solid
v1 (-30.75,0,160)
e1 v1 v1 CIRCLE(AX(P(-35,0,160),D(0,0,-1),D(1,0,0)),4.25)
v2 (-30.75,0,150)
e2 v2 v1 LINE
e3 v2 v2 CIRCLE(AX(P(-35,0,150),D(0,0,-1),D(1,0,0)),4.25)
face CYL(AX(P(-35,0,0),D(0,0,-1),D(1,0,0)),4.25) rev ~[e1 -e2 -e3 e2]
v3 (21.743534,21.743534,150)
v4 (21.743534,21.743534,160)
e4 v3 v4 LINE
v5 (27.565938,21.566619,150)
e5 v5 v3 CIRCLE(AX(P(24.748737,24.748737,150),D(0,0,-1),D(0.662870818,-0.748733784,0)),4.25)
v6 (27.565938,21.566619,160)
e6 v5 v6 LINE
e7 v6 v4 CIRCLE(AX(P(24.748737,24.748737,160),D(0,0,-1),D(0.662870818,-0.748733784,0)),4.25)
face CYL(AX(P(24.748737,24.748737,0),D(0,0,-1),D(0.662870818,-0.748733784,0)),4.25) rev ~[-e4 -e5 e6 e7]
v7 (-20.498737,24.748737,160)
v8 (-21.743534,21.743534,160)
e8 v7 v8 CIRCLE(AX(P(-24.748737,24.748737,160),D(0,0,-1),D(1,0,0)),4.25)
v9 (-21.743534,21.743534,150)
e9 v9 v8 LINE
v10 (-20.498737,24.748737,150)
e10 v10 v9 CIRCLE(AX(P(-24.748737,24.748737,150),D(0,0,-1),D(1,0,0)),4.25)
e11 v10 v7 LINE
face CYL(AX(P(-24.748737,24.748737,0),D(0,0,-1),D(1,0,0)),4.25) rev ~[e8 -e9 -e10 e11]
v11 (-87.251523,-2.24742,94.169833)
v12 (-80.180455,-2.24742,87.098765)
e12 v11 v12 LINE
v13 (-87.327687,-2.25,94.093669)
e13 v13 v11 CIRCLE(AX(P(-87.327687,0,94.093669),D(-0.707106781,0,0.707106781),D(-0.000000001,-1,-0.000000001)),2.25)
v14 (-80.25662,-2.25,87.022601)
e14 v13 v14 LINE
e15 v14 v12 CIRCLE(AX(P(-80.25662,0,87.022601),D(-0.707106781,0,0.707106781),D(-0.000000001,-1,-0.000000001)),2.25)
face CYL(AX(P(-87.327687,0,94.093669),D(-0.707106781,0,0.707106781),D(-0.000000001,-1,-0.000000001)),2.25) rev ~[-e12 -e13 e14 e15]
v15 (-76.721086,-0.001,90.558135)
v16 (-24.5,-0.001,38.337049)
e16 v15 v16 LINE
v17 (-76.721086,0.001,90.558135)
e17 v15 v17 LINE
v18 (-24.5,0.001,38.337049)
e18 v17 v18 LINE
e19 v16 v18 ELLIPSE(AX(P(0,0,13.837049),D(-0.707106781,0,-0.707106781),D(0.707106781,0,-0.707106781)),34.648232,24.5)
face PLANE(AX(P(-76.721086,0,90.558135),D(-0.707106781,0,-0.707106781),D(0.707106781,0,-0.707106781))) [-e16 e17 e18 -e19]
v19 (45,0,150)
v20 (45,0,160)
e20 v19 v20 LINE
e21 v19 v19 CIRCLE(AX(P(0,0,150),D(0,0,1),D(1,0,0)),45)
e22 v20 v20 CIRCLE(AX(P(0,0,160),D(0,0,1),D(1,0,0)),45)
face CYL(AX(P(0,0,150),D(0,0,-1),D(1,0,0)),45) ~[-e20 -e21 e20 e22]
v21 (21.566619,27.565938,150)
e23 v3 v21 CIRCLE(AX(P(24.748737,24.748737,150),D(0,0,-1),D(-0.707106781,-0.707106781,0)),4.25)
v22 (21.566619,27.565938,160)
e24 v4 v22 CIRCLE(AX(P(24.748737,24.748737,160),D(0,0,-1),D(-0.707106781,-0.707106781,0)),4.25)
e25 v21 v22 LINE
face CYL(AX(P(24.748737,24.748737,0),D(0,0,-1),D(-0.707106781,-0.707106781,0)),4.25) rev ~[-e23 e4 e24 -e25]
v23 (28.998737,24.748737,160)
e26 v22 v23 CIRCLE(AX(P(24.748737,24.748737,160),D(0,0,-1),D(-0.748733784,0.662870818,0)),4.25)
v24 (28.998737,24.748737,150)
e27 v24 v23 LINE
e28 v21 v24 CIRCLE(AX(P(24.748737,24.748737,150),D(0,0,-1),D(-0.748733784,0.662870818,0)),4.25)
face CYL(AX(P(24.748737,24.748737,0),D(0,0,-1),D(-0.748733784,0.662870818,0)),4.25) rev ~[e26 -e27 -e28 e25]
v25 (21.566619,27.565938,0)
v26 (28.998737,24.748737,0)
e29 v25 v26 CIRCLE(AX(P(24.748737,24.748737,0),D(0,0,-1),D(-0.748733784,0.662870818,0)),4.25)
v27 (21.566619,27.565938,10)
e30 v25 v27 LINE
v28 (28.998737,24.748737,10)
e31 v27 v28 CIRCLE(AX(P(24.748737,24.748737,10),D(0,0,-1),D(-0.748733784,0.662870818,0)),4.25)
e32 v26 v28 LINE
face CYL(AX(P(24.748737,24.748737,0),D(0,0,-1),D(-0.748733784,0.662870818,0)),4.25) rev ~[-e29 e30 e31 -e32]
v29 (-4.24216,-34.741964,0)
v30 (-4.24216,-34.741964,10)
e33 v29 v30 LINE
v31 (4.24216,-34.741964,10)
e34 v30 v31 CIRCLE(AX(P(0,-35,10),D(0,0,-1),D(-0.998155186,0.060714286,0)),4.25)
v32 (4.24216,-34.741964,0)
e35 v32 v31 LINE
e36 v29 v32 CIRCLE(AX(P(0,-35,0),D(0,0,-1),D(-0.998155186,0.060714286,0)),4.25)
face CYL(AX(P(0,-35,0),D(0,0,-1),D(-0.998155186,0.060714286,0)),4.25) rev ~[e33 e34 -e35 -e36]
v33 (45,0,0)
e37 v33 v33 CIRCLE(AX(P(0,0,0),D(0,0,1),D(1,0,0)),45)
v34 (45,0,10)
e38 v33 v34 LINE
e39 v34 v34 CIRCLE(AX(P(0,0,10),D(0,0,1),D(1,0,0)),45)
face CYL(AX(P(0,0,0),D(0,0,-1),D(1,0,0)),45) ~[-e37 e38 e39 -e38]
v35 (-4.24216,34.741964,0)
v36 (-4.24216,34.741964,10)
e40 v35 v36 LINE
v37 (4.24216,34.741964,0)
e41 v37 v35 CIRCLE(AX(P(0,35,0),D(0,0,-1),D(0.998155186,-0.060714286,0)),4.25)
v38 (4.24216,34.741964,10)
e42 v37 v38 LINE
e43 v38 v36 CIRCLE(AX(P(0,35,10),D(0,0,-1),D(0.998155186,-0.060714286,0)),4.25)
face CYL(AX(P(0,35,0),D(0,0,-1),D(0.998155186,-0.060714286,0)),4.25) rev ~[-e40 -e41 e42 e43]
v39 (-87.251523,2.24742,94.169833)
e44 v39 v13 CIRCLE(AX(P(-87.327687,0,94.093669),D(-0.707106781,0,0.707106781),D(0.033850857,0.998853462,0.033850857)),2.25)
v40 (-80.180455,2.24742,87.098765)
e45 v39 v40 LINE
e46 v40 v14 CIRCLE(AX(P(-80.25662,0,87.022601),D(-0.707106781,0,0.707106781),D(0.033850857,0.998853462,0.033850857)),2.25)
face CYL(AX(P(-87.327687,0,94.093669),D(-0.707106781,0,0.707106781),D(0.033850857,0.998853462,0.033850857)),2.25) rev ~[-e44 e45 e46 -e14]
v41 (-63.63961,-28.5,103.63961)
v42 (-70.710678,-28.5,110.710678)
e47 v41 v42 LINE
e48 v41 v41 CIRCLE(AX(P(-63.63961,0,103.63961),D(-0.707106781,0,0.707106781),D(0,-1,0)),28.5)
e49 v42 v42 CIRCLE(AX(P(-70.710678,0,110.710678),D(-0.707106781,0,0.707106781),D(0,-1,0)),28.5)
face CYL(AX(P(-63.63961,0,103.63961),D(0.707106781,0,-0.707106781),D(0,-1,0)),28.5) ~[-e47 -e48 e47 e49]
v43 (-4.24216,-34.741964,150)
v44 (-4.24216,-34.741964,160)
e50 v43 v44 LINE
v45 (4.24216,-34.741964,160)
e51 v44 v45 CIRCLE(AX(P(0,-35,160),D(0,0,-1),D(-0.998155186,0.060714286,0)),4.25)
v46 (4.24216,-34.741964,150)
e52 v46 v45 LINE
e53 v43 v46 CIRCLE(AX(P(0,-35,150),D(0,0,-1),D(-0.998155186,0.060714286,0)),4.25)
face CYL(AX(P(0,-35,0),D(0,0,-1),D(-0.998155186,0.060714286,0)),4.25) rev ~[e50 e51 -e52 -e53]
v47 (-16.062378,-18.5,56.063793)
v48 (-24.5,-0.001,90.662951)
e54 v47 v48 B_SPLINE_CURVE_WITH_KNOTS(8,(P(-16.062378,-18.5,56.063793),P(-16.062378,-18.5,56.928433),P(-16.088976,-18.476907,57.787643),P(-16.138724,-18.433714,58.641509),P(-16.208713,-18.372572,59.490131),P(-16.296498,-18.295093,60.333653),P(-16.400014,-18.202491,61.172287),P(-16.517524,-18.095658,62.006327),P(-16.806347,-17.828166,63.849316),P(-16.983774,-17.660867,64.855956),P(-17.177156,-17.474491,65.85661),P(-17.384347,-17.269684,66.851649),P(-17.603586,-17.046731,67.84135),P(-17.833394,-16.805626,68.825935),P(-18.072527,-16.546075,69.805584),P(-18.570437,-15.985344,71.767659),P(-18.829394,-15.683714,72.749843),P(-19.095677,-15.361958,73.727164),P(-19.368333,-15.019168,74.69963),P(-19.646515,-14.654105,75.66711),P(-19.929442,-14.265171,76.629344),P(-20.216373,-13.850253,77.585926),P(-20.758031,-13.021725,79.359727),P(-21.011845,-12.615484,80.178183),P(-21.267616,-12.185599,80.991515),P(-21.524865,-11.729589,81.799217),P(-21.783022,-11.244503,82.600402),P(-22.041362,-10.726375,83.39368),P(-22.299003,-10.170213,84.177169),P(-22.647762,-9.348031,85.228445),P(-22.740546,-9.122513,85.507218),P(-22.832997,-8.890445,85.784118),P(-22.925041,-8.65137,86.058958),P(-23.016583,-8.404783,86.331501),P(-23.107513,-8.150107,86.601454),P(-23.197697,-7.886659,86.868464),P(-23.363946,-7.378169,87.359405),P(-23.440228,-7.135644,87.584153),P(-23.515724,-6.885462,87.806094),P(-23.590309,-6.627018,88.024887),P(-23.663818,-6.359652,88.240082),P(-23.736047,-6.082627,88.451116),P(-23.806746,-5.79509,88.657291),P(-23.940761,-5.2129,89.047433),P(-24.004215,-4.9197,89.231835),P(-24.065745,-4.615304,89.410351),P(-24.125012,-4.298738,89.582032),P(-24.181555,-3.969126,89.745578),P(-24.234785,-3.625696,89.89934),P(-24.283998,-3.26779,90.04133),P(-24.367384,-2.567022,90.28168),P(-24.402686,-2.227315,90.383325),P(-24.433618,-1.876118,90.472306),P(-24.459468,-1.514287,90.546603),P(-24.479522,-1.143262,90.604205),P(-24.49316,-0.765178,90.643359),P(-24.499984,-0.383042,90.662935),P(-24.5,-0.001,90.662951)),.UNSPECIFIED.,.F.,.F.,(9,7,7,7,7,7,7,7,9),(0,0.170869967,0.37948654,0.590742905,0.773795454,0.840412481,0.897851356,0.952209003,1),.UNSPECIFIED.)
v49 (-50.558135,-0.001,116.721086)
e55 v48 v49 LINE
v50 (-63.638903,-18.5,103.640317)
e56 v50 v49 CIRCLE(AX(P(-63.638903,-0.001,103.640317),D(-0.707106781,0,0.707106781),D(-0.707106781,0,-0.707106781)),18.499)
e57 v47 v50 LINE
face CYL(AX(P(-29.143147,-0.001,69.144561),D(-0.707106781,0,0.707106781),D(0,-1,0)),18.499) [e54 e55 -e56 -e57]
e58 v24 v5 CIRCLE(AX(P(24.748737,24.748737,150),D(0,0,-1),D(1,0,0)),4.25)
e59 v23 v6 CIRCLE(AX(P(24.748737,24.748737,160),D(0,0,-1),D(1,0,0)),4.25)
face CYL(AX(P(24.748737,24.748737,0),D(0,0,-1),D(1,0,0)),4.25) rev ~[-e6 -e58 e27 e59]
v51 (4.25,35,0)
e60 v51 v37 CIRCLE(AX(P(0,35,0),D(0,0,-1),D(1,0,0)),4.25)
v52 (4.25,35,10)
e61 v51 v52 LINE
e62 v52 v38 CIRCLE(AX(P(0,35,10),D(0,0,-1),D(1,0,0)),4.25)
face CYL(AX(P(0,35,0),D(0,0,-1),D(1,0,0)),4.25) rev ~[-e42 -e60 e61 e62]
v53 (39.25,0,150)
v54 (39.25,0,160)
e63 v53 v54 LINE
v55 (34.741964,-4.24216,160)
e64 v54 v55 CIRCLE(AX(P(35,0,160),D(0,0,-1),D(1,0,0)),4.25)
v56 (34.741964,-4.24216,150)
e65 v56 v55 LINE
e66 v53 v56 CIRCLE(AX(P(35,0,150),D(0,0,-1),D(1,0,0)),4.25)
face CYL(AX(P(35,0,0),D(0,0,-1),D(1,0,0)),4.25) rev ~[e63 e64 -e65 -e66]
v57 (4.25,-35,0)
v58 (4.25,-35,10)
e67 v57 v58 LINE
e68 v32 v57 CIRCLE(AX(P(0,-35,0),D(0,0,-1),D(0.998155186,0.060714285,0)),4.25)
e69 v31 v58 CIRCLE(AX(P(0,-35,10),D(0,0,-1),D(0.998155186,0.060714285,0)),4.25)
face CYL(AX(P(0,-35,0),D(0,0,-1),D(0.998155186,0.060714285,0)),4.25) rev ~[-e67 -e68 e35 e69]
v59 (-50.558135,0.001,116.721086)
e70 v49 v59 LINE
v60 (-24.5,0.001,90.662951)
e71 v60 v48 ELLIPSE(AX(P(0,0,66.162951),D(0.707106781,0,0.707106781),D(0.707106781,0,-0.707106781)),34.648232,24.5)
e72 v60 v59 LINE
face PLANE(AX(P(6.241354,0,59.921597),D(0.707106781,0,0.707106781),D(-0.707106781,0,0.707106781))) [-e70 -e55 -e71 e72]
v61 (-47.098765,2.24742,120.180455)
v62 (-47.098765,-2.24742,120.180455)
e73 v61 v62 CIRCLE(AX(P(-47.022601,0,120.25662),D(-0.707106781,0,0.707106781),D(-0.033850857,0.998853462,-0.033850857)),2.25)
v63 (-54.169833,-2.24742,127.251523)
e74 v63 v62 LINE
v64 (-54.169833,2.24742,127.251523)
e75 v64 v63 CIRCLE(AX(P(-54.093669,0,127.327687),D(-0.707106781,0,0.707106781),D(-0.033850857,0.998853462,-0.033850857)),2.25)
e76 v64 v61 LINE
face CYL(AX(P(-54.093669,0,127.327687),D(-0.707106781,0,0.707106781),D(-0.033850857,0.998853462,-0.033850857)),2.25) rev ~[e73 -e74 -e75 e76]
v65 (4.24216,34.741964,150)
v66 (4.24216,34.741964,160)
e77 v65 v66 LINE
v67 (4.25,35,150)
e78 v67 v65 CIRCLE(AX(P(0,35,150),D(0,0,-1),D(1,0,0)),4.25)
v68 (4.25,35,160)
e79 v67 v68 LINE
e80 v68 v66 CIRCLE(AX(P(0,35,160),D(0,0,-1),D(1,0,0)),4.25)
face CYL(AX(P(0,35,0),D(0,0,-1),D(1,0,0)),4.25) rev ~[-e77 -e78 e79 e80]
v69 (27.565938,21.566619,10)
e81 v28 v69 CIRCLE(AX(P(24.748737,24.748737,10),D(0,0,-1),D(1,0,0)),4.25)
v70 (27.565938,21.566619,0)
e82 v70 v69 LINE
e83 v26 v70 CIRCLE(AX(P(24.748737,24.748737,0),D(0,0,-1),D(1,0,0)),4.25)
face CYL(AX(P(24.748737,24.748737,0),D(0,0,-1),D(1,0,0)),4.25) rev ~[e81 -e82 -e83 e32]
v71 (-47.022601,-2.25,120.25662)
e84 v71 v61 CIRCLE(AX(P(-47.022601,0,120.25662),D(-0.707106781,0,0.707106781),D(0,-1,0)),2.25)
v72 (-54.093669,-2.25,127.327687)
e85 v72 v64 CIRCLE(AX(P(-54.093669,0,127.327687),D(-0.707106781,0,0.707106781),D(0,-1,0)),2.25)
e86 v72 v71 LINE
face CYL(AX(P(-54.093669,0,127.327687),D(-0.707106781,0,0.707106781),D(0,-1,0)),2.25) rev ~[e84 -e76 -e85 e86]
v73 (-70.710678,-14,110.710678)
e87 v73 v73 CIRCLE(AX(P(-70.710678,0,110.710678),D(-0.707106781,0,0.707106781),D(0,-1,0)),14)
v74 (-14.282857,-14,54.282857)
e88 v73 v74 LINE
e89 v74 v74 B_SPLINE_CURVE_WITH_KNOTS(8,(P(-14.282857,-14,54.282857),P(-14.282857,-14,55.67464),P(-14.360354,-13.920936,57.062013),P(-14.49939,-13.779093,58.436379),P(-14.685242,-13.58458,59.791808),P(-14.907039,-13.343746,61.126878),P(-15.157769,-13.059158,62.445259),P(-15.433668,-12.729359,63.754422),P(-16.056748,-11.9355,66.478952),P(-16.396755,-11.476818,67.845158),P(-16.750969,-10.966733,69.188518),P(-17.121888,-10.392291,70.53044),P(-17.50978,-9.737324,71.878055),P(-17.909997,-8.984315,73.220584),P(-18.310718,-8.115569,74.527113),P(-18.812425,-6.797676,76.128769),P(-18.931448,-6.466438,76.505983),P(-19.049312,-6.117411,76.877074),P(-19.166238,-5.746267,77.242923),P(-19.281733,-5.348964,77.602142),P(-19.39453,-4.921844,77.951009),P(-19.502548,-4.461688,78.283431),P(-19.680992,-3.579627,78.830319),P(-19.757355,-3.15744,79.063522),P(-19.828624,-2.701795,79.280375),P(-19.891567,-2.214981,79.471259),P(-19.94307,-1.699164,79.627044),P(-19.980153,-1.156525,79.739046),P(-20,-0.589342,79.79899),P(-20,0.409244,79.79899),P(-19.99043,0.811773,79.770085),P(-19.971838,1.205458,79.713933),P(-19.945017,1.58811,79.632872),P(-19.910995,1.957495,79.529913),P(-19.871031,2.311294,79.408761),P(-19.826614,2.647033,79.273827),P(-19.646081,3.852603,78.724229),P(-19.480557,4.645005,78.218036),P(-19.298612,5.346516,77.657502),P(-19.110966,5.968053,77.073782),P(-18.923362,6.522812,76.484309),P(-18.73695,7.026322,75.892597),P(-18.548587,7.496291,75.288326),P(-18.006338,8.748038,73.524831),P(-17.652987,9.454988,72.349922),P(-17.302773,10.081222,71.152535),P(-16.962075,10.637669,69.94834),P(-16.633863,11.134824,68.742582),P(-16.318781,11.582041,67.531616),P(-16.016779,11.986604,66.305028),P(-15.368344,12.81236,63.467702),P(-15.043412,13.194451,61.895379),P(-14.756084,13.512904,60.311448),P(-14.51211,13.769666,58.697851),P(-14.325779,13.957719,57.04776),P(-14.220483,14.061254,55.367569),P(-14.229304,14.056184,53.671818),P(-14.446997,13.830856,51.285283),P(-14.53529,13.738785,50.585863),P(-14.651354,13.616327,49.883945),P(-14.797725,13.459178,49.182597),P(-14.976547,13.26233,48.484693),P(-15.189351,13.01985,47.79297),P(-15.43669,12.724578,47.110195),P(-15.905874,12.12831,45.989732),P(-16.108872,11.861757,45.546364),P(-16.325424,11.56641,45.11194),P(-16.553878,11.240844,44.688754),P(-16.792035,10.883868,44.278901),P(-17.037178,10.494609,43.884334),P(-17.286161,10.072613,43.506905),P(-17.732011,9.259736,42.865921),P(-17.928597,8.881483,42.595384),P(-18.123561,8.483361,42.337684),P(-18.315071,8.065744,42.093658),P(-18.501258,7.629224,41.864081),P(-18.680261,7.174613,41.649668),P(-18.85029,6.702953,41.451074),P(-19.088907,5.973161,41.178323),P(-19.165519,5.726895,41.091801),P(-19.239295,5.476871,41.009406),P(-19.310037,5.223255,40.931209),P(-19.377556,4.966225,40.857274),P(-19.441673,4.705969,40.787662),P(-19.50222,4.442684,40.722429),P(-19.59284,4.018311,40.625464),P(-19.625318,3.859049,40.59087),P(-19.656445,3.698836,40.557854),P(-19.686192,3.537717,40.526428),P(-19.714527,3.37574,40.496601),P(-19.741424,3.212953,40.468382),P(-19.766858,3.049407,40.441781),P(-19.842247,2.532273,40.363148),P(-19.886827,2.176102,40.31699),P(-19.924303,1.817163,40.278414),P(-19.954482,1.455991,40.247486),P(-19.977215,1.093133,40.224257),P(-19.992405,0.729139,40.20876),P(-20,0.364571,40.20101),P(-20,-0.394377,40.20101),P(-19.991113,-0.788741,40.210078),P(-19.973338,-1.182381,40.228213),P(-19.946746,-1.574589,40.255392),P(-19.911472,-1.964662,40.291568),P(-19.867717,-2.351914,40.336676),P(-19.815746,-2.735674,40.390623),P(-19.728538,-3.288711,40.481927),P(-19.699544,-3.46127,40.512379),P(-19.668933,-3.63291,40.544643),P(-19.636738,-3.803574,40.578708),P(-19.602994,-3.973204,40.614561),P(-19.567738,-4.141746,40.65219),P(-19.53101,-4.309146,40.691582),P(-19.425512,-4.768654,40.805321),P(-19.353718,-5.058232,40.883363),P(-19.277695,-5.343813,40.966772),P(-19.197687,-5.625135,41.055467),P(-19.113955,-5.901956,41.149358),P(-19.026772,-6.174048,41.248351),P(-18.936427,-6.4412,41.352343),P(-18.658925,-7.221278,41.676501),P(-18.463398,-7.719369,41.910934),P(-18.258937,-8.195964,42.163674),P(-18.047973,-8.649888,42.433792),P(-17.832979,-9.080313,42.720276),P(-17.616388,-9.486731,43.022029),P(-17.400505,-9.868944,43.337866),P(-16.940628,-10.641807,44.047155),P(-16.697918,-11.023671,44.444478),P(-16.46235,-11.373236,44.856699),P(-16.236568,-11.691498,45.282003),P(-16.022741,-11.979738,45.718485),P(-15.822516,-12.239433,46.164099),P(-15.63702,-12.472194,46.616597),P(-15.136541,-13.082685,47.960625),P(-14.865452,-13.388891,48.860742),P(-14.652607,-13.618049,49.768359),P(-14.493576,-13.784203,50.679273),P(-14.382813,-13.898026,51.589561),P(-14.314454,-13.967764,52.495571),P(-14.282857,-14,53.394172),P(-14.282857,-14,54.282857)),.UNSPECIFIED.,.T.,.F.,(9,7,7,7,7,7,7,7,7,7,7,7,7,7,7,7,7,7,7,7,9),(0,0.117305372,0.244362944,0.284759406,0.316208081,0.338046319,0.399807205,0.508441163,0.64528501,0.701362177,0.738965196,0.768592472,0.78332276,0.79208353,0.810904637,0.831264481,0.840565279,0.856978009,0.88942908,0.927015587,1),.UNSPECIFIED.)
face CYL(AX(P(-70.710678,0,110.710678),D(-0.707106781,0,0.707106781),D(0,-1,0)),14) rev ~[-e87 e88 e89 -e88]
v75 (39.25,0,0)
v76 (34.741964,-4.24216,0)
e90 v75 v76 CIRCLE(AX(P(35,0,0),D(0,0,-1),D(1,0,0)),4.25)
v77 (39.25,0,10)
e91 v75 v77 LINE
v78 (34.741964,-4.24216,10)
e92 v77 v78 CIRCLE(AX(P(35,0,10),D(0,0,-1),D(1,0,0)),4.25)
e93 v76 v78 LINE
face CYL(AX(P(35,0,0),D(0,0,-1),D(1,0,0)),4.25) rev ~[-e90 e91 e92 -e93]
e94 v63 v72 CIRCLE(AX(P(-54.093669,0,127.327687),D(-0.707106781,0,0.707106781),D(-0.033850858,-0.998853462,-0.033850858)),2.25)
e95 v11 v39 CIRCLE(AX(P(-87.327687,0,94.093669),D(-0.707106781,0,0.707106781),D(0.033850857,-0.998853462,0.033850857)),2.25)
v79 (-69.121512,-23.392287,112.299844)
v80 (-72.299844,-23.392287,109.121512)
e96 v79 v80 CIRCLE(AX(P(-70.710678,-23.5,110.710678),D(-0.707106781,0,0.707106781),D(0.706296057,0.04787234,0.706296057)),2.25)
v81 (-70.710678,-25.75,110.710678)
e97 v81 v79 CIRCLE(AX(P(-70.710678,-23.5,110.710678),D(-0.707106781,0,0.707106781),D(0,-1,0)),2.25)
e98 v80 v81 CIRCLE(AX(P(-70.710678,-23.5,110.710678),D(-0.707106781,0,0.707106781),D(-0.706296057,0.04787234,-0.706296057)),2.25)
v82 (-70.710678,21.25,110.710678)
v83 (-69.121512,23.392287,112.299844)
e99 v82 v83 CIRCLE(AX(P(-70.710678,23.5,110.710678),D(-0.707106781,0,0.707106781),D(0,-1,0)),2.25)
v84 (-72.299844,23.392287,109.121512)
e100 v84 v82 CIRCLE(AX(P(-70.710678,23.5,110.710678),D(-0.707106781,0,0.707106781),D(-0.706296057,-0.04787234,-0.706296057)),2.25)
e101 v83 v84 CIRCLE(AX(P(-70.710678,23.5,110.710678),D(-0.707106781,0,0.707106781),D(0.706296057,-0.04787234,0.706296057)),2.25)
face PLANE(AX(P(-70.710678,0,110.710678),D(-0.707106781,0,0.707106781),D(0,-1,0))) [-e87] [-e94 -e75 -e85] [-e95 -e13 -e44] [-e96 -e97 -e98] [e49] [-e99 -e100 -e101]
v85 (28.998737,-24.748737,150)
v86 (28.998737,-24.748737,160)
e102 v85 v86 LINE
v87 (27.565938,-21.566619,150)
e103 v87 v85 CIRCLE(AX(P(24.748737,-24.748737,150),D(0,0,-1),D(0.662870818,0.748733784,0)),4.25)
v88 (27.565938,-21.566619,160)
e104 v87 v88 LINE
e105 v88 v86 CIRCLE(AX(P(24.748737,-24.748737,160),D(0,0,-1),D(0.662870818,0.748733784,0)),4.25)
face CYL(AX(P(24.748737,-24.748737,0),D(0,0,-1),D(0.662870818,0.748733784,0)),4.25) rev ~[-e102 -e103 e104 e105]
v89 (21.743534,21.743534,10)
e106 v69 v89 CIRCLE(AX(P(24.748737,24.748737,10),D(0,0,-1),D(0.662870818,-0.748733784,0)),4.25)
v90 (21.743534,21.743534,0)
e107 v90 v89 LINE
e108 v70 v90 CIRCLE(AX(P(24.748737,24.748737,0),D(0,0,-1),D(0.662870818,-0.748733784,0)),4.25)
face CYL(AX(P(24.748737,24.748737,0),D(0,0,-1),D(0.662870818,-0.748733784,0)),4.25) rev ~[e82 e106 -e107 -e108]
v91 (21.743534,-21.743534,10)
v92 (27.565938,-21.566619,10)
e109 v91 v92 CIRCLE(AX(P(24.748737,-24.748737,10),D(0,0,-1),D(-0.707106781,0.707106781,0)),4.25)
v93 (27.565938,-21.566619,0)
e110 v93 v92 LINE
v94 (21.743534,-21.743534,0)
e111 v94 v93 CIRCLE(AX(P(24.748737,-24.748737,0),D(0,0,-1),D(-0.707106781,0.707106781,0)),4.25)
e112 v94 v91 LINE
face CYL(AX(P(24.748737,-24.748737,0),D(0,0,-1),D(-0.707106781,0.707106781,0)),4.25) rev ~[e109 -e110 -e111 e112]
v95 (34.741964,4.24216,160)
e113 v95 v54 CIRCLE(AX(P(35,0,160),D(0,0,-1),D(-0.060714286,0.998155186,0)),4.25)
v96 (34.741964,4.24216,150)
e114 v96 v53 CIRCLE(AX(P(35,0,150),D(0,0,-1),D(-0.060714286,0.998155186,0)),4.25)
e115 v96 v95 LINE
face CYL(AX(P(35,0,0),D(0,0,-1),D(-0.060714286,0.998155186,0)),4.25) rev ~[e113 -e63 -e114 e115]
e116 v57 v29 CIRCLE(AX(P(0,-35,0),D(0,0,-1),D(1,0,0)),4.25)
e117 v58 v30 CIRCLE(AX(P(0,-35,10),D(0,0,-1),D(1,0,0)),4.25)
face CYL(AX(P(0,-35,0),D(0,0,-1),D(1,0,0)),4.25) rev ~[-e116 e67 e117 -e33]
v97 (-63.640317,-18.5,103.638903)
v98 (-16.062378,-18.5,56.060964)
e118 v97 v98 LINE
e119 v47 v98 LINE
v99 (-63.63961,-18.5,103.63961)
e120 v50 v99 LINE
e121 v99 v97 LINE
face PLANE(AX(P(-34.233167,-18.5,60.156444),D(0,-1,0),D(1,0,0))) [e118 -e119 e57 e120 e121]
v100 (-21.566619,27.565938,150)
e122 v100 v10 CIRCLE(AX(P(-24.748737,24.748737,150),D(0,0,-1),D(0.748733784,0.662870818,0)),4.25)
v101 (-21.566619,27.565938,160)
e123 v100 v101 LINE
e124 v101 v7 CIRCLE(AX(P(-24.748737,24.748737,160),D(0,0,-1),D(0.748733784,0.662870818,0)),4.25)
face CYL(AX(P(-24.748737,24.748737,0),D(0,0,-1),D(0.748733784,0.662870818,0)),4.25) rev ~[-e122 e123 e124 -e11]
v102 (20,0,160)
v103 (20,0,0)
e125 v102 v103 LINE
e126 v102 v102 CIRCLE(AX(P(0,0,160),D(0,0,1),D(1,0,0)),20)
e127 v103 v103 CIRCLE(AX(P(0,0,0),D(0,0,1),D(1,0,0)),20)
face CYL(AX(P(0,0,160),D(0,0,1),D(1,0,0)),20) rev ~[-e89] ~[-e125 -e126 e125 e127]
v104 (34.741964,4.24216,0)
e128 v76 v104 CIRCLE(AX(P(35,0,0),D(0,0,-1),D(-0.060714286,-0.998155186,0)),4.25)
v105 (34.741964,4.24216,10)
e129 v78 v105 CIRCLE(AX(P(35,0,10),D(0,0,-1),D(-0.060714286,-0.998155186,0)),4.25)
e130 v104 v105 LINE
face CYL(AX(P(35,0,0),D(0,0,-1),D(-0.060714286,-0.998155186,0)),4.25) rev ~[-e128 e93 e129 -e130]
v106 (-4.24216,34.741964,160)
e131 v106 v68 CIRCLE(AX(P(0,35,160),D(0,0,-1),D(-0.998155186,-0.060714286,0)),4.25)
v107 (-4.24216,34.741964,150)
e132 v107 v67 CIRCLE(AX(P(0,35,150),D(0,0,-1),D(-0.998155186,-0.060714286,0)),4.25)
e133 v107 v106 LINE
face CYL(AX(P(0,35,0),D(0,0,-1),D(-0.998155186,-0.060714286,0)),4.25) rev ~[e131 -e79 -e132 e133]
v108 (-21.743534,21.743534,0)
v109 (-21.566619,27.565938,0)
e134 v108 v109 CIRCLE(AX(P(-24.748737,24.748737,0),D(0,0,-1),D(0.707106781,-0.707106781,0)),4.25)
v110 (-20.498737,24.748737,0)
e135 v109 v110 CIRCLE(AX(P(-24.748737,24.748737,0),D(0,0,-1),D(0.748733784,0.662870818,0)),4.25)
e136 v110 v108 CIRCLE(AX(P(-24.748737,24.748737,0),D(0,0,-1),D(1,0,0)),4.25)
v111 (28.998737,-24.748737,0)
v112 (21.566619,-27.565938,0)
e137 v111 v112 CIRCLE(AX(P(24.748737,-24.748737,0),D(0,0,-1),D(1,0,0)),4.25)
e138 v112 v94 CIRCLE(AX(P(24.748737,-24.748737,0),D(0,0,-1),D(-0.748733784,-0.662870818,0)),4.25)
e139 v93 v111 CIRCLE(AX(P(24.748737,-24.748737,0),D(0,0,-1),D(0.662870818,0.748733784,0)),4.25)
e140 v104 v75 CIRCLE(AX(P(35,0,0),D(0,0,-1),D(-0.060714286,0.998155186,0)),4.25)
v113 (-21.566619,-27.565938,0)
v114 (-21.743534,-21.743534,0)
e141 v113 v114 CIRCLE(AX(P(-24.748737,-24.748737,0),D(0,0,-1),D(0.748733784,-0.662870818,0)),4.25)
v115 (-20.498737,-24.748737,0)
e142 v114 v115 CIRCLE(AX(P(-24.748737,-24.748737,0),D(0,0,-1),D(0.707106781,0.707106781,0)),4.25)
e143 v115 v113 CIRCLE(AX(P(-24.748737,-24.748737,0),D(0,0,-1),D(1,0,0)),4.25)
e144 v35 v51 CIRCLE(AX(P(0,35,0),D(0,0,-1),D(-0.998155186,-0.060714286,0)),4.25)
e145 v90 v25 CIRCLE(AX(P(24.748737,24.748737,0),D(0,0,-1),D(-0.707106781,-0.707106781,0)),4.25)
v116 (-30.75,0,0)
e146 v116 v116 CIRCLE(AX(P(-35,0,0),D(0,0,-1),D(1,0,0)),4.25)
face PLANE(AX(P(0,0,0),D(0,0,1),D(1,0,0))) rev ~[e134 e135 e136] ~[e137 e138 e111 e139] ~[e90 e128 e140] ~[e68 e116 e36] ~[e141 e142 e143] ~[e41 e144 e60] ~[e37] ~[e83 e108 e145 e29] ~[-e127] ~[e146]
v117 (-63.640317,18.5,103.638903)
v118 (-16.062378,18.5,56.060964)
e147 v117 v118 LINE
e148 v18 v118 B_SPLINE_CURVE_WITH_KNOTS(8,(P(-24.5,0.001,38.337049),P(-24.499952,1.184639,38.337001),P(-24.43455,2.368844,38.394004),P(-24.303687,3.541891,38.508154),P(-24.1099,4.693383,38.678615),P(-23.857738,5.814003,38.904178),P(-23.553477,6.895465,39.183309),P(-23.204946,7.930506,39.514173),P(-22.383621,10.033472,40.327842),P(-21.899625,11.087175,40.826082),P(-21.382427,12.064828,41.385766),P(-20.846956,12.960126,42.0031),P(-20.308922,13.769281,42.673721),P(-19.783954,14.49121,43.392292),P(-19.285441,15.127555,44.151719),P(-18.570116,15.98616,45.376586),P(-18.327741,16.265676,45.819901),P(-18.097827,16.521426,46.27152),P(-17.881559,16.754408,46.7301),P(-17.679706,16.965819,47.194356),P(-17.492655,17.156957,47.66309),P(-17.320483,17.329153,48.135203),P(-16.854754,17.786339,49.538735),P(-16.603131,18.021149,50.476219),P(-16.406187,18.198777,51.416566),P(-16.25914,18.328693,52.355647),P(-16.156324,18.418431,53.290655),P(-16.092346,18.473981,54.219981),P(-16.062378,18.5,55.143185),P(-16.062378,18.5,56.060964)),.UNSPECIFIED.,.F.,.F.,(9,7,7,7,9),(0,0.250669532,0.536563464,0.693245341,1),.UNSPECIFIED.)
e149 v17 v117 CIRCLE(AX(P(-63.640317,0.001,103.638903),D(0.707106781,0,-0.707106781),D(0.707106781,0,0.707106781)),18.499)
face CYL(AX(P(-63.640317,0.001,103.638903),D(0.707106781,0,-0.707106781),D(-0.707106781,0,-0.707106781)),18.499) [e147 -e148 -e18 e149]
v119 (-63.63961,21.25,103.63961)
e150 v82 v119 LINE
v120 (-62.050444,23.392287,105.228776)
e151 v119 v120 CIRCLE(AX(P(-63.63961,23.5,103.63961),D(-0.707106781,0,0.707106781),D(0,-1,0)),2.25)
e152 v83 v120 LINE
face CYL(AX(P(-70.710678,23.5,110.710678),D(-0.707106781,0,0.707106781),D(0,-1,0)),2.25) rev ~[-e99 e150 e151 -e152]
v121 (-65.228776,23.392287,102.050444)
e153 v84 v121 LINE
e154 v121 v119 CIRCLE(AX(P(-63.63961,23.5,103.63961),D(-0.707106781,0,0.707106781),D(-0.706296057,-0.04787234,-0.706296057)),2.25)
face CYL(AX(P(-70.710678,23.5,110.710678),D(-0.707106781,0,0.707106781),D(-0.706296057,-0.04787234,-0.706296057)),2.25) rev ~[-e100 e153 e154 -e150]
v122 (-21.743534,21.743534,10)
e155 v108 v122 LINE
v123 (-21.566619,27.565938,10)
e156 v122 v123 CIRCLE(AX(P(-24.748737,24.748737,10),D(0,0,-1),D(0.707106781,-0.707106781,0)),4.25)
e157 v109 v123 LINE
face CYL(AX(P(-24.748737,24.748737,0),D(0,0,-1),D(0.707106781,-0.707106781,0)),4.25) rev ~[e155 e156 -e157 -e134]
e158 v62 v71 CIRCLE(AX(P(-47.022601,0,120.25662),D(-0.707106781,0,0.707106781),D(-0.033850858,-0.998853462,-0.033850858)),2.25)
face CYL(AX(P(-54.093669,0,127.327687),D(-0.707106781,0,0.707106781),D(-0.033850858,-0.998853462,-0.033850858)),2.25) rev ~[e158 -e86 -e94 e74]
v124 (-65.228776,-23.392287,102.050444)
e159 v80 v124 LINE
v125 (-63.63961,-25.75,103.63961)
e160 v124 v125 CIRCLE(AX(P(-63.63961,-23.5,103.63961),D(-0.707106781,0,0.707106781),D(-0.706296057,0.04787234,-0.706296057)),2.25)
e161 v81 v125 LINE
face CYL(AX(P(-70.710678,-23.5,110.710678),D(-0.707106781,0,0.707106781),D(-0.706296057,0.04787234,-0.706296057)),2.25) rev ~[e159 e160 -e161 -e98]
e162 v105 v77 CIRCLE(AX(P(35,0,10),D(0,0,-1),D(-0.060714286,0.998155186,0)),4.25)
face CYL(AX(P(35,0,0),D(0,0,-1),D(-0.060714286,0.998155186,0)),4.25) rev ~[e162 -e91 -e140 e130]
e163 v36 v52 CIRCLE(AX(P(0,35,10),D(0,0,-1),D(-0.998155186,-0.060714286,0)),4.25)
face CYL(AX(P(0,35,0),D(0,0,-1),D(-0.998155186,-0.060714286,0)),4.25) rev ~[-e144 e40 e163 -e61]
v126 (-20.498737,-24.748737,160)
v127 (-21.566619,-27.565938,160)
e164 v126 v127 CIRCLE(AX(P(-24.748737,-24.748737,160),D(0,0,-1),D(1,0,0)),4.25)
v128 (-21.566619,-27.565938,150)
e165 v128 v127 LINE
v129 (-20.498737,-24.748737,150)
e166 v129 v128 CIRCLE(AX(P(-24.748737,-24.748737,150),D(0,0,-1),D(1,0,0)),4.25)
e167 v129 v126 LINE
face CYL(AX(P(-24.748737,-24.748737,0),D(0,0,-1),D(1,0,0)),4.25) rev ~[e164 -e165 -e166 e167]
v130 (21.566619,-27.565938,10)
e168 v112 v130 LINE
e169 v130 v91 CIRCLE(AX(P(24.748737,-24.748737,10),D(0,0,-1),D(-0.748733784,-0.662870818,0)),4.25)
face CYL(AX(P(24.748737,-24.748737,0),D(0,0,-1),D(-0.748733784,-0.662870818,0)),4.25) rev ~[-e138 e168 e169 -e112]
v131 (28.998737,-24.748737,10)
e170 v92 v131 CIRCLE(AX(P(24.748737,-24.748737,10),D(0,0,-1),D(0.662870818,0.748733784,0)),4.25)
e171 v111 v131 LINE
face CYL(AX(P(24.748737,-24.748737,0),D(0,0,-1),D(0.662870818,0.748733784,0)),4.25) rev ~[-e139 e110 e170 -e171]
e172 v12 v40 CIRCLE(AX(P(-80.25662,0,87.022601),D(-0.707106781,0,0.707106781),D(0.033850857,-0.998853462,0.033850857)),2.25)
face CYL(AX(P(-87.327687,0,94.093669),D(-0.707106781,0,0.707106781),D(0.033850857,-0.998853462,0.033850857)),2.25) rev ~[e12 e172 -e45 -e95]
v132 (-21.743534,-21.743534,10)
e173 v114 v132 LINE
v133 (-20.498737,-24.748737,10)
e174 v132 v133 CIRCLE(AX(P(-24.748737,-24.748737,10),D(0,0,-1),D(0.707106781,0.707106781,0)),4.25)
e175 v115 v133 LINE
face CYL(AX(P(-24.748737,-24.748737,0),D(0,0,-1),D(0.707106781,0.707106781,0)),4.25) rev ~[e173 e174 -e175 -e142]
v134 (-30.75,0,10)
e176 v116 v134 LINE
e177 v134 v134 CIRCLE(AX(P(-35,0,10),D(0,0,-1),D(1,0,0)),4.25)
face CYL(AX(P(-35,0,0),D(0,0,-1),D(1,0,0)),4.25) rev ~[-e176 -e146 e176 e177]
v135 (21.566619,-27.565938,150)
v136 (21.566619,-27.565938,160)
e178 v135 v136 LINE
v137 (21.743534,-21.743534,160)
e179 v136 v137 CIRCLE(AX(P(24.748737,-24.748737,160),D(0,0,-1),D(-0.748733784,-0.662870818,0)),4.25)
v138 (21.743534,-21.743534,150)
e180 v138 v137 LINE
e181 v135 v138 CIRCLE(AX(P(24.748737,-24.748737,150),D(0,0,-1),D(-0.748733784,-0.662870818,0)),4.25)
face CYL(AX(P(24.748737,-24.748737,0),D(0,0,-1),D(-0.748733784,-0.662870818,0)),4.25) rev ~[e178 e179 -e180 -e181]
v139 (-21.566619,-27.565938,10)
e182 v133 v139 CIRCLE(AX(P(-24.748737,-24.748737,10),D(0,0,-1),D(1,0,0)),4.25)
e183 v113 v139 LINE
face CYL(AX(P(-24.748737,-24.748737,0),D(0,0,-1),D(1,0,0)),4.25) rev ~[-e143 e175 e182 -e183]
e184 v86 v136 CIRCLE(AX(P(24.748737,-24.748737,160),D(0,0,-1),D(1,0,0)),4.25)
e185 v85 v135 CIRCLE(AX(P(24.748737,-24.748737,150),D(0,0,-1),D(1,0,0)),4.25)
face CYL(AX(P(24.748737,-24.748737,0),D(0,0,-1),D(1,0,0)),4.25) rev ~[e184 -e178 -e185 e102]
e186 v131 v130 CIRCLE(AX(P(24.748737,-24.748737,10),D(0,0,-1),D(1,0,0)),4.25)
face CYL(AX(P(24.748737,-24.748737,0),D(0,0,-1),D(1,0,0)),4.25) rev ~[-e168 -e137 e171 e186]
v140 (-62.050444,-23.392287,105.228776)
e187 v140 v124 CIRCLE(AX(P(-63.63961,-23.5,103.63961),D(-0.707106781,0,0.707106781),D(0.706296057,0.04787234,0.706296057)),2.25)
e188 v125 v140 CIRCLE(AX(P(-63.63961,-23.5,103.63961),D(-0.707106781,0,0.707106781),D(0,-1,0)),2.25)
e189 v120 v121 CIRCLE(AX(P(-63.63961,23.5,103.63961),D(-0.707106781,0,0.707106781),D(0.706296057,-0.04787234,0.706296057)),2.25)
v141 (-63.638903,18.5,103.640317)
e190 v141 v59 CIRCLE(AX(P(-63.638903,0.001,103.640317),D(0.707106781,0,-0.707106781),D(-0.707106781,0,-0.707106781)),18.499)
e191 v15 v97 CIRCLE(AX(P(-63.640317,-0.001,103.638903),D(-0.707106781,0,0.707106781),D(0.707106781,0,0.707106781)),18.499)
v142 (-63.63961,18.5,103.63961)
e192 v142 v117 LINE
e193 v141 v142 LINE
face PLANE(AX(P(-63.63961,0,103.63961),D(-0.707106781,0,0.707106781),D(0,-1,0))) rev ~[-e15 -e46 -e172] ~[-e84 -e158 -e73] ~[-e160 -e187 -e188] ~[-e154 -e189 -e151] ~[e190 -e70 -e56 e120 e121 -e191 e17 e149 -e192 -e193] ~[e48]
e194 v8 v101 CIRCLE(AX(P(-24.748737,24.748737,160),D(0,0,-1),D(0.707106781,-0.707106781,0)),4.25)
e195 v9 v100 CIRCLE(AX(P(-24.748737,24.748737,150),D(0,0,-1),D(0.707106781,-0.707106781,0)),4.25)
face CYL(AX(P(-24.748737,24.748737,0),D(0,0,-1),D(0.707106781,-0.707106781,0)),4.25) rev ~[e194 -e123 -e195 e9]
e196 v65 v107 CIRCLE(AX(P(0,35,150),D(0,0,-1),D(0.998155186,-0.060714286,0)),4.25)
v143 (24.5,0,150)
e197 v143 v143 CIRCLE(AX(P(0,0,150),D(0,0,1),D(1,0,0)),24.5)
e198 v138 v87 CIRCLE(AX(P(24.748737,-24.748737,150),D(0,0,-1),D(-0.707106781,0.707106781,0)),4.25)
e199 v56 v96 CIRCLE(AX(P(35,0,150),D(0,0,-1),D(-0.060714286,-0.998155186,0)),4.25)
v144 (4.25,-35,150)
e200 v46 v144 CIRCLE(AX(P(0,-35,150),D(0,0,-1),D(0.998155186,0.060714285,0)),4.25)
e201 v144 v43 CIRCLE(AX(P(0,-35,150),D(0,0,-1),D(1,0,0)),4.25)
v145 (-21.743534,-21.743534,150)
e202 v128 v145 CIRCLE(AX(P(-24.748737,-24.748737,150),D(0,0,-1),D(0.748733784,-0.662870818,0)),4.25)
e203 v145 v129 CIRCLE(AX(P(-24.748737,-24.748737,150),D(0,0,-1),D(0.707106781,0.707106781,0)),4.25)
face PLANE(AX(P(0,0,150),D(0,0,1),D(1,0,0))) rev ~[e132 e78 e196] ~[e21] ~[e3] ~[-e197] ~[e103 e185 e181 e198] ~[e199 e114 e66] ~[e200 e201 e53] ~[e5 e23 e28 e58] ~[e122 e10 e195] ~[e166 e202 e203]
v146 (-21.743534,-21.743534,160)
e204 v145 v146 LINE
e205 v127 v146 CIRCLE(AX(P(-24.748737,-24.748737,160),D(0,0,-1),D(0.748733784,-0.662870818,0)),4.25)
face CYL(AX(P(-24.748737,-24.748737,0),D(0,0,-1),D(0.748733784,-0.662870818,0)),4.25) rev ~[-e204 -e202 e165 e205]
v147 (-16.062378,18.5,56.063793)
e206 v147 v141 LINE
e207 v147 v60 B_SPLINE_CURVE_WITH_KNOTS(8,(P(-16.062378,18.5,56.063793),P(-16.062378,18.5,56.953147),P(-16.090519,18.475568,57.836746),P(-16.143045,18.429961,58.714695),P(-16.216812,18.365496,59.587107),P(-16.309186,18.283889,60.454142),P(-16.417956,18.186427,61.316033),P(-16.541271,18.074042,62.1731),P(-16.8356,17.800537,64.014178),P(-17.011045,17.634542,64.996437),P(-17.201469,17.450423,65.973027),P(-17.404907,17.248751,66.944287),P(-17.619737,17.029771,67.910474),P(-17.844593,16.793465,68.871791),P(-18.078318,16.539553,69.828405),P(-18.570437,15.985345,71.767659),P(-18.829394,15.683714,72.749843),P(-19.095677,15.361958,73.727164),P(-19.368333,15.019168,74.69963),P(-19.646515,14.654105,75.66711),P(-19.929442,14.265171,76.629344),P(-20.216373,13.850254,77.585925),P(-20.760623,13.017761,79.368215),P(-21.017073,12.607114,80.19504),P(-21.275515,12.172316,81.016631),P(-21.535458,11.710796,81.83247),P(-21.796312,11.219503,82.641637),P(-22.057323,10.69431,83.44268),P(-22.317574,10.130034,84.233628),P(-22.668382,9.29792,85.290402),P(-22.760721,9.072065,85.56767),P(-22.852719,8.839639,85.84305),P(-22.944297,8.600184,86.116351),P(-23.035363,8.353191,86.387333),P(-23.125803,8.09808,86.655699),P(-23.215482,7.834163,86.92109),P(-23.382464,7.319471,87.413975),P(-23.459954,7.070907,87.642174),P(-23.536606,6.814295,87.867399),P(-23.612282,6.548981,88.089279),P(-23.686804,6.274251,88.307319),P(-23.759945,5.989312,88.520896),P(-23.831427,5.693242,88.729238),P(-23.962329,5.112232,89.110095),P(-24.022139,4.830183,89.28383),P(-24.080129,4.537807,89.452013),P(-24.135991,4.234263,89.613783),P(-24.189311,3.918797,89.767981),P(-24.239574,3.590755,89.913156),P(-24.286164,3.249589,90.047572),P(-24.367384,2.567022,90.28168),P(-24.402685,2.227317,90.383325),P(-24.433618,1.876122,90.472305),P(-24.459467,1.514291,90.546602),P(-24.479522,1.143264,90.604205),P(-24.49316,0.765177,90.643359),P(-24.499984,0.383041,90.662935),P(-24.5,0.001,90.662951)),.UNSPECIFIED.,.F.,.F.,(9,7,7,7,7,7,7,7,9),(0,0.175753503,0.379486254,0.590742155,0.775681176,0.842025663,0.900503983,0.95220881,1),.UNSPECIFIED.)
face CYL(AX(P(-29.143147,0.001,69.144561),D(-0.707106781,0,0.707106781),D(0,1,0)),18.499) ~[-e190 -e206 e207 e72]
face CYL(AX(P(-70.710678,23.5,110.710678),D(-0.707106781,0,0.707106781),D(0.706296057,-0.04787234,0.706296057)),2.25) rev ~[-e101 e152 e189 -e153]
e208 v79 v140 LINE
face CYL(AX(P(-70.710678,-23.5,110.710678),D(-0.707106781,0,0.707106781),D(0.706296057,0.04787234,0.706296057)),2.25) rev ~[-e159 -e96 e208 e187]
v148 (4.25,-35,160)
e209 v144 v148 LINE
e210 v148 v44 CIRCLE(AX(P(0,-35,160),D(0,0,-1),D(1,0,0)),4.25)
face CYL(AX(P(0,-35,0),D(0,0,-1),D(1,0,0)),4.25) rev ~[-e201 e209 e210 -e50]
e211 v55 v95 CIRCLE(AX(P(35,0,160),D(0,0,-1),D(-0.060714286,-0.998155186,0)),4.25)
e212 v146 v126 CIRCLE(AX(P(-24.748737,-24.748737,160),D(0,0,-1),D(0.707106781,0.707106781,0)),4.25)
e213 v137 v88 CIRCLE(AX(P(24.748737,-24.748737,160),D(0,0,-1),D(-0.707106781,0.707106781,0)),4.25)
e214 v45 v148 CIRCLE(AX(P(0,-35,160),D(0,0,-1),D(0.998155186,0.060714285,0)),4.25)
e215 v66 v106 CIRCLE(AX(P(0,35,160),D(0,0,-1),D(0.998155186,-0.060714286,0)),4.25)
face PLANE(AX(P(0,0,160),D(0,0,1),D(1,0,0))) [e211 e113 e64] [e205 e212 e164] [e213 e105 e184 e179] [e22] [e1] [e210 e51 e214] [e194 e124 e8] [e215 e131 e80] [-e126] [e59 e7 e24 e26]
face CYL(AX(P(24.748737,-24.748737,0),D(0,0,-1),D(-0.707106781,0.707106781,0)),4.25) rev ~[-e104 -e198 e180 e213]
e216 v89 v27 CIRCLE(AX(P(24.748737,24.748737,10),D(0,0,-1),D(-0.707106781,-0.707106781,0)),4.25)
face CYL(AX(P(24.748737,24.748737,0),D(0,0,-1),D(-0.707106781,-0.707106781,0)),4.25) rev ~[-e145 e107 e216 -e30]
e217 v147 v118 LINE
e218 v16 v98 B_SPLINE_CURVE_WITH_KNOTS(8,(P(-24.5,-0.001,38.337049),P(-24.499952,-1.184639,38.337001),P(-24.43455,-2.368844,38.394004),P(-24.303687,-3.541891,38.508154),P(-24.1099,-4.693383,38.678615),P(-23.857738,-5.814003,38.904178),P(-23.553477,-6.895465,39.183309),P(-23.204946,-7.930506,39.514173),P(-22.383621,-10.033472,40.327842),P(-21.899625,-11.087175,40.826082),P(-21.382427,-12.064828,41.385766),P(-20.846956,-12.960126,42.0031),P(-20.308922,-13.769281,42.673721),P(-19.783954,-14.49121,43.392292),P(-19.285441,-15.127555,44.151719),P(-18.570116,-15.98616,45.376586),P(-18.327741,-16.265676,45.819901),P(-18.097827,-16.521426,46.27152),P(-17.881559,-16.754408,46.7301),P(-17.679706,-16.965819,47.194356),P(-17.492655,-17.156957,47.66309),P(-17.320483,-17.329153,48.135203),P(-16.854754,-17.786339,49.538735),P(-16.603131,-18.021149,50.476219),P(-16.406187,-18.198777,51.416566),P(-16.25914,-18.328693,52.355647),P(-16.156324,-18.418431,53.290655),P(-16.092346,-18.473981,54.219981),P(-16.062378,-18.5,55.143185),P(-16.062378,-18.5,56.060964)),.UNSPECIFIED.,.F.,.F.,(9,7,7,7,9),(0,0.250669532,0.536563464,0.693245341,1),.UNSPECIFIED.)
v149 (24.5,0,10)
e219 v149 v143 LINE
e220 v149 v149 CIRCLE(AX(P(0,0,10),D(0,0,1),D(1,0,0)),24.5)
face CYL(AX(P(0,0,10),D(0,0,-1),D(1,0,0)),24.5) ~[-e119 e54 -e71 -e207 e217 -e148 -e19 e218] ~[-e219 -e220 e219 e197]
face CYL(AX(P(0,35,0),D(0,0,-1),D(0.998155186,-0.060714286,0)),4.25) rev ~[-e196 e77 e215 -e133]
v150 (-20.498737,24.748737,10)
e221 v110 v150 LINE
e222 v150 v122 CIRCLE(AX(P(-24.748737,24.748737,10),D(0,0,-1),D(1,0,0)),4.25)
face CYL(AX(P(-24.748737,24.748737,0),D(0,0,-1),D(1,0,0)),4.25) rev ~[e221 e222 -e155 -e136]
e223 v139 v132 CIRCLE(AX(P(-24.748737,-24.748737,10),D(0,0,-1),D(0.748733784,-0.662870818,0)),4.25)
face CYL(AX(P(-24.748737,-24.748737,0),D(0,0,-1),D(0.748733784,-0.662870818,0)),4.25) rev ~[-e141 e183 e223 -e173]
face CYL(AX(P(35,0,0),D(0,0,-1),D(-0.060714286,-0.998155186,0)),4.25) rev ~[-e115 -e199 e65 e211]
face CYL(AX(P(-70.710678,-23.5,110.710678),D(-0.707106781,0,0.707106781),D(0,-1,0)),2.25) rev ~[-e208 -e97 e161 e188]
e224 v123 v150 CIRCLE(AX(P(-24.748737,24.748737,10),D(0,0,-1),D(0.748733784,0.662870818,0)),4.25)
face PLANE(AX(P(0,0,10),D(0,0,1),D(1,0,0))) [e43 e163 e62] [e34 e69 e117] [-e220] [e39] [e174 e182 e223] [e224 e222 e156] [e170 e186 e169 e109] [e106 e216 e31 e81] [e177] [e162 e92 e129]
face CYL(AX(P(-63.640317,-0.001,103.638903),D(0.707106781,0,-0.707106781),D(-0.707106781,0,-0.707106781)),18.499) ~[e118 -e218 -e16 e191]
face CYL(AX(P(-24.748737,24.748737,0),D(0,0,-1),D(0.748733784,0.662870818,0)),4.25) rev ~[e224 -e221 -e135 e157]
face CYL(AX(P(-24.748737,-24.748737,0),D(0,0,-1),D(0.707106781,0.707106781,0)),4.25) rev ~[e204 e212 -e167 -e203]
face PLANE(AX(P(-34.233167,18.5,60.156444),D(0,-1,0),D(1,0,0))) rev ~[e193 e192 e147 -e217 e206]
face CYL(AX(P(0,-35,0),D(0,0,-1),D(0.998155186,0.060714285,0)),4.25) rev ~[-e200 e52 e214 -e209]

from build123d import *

# Parameters (mm, degrees)
F0_R      = 45
F1_DEPTH  = 10
F2_R      = 24.5
F2_R_2    = 20
F3_DEPTH  = 140
F4_R      = 45
F4_R_2    = 24.5
F4_R_3    = 20
F5_DEPTH  = 10
F8_DEPTH  = 195
F10_DEPTH = 18.5
F11_R     = 18.499
F12_R     = 28.5
F13_DEPTH = 10
F15_DEPTH = 25
F16_R     = 14
F17_DEPTH = 99.7
F18_R     = 20
F19_DEPTH = 202.6


# Not quite as in the source:
# - a fillet or chamfer is up to 0.001 mm smaller than in the source, because OpenCascade refuses the exact size


with BuildPart() as f1:
    # F0 (on Top) → F1 (new body)
    with BuildSketch(Plane.XY):
        Circle(F0_R)
    extrude(amount=F1_DEPTH)

    # F2 (on face) → F3 (join)
    with BuildSketch(Plane.XY.offset(10)):
        Circle(F2_R)
        Circle(F2_R_2, mode=Mode.SUBTRACT)
        Circle(F2_R_2)
    extrude(amount=F3_DEPTH)

    # F4 (on face) → F5 (join)
    with BuildSketch(Plane.XY.offset(150)):
        Circle(F4_R)
        Circle(F4_R_2, mode=Mode.SUBTRACT)
        Circle(F4_R_2)
        Circle(F4_R_3, mode=Mode.SUBTRACT)
        Circle(F4_R_3)
    extrude(amount=F5_DEPTH)

    # F7 (on face) → F8 (cut)
    with BuildSketch(Plane(origin=(0, 0, 0), x_dir=(1, 0, 0), z_dir=(0, 0, -1))):
        with BuildLine():
            ThreePointArc((-34.7419642857, -4.2421595409), (-35, 0), (-34.7419642857, 4.2421595409))
            ThreePointArc((-34.7419642857, 4.2421595409), (-39.25, 0), (-34.7419642857, -4.2421595409))
        make_face()
        with BuildLine():
            ThreePointArc((-30.75, 0), (-31.904911004, 2.9125459837), (-34.7419642857, 4.2421595409))
            ThreePointArc((-34.7419642857, 4.2421595409), (-35, 0), (-34.7419642857, -4.2421595409))
            ThreePointArc((-34.7419642857, -4.2421595409), (-31.904911004, -2.9125459837), (-30.75, 0))
        make_face()
        with BuildLine():
            ThreePointArc((-4.2421595409, -34.7419642857), (0, -35), (4.2421595409, -34.7419642857))
            ThreePointArc((4.2421595409, -34.7419642857), (0, -30.75), (-4.2421595409, -34.7419642857))
        make_face()
        with BuildLine():
            ThreePointArc((4.25, -35), (4.248039433, -34.8709225982), (4.2421595409, -34.7419642857))
            ThreePointArc((4.2421595409, -34.7419642857), (0, -35), (-4.2421595409, -34.7419642857))
            ThreePointArc((-4.2421595409, -34.7419642857), (-0.1290774018, -39.248039433), (4.25, -35))
        make_face()
        with BuildLine():
            ThreePointArc((34.7419642857, -4.2421595409), (34.935431513, -2.125), (35, 0))
            ThreePointArc((35, 0), (34.935431513, 2.125), (34.7419642857, 4.2421595409))
            ThreePointArc((34.7419642857, 4.2421595409), (30.75, 0), (34.7419642857, -4.2421595409))
        make_face()
        with BuildLine():
            ThreePointArc((34.7419642857, 4.2421595409), (34.935431513, 2.125), (35, 0))
            ThreePointArc((35, 0), (34.935431513, -2.125), (34.7419642857, -4.2421595409))
            ThreePointArc((34.7419642857, -4.2421595409), (37.9125459837, -3.095088996), (39.25, 0))
            ThreePointArc((39.25, 0), (37.9125459837, 3.095088996), (34.7419642857, 4.2421595409))
        make_face()
        with BuildLine():
            ThreePointArc((24.7487373415, 24.7487373415), (26.2056824365, 23.2004786165), (27.5659383164, 21.5666187599))
            ThreePointArc((27.5659383164, 21.5666187599), (28.6240182438, 23.0038310608), (28.9987373415, 24.7487373415))
            ThreePointArc((28.9987373415, 24.7487373415), (26.2551396829, 28.7228098102), (21.5666187599, 27.5659383164))
            ThreePointArc((21.5666187599, 27.5659383164), (23.2004786165, 26.2056824365), (24.7487373415, 24.7487373415))
        make_face()
        with BuildLine():
            ThreePointArc((21.7435335215, 21.7435335215), (24.6196599397, 20.5006979085), (27.5659383164, 21.5666187599))
            ThreePointArc((27.5659383164, 21.5666187599), (26.2056824365, 23.2004786165), (24.7487373415, 24.7487373415))
            Line((24.7487373415, 24.7487373415), (21.7435335215, 21.7435335215))
        make_face()
        with BuildLine():
            Line((21.7435335215, 21.7435335215), (24.7487373415, 24.7487373415))
            ThreePointArc((24.7487373415, 24.7487373415), (23.2004786165, 26.2056824365), (21.5666187599, 27.5659383164))
            ThreePointArc((21.5666187599, 27.5659383164), (20.5006979085, 24.6196599397), (21.7435335215, 21.7435335215))
        make_face()
        with BuildLine():
            ThreePointArc((28.9987373415, -24.7487373415), (28.6240182438, -23.0038310608), (27.5659383164, -21.5666187599))
            ThreePointArc((27.5659383164, -21.5666187599), (26.2056824365, -23.2004786165), (24.7487373415, -24.7487373415))
            ThreePointArc((24.7487373415, -24.7487373415), (23.2004786165, -26.2056824365), (21.5666187599, -27.5659383164))
            ThreePointArc((21.5666187599, -27.5659383164), (26.2551396829, -28.7228098102), (28.9987373415, -24.7487373415))
        make_face()
        with BuildLine():
            ThreePointArc((21.5666187599, -27.5659383164), (23.2004786165, -26.2056824365), (24.7487373415, -24.7487373415))
            Line((24.7487373415, -24.7487373415), (21.7435335215, -21.7435335215))
            ThreePointArc((21.7435335215, -21.7435335215), (20.5006979085, -24.6196599397), (21.5666187599, -27.5659383164))
        make_face()
        with BuildLine():
            ThreePointArc((24.7487373415, -24.7487373415), (26.2056824365, -23.2004786165), (27.5659383164, -21.5666187599))
            ThreePointArc((27.5659383164, -21.5666187599), (24.6196599397, -20.5006979085), (21.7435335215, -21.7435335215))
            Line((21.7435335215, -21.7435335215), (24.7487373415, -24.7487373415))
        make_face()
        with BuildLine():
            ThreePointArc((-27.5659383164, -21.5666187599), (-27.7539411616, -27.7539411616), (-21.5666187599, -27.5659383164))
            ThreePointArc((-21.5666187599, -27.5659383164), (-23.2004786165, -26.2056824365), (-24.7487373415, -24.7487373415))
            ThreePointArc((-24.7487373415, -24.7487373415), (-26.2056824365, -23.2004786165), (-27.5659383164, -21.5666187599))
        make_face()
        with BuildLine():
            Line((-24.7487373415, -24.7487373415), (-21.7435335215, -21.7435335215))
            ThreePointArc((-21.7435335215, -21.7435335215), (-24.6196599397, -20.5006979085), (-27.5659383164, -21.5666187599))
            ThreePointArc((-27.5659383164, -21.5666187599), (-26.2056824365, -23.2004786165), (-24.7487373415, -24.7487373415))
        make_face()
        with BuildLine():
            ThreePointArc((-20.4987373415, -24.7487373415), (-20.8222493284, -23.122332754), (-21.7435335215, -21.7435335215))
            Line((-21.7435335215, -21.7435335215), (-24.7487373415, -24.7487373415))
            ThreePointArc((-24.7487373415, -24.7487373415), (-23.2004786165, -26.2056824365), (-21.5666187599, -27.5659383164))
            ThreePointArc((-21.5666187599, -27.5659383164), (-20.7746648729, -26.2551396829), (-20.4987373415, -24.7487373415))
        make_face()
        with BuildLine():
            ThreePointArc((-24.7487373415, 24.7487373415), (-23.2004786165, 26.2056824365), (-21.5666187599, 27.5659383164))
            ThreePointArc((-21.5666187599, 27.5659383164), (-27.7539411616, 27.7539411616), (-27.5659383164, 21.5666187599))
            ThreePointArc((-27.5659383164, 21.5666187599), (-26.2056824365, 23.2004786165), (-24.7487373415, 24.7487373415))
        make_face()
        with BuildLine():
            ThreePointArc((-20.4987373415, 24.7487373415), (-20.7746648729, 26.2551396829), (-21.5666187599, 27.5659383164))
            ThreePointArc((-21.5666187599, 27.5659383164), (-23.2004786165, 26.2056824365), (-24.7487373415, 24.7487373415))
            Line((-24.7487373415, 24.7487373415), (-21.7435335215, 21.7435335215))
            ThreePointArc((-21.7435335215, 21.7435335215), (-20.8222493284, 23.122332754), (-20.4987373415, 24.7487373415))
        make_face()
        with BuildLine():
            ThreePointArc((-27.5659383164, 21.5666187599), (-24.6196599397, 20.5006979085), (-21.7435335215, 21.7435335215))
            Line((-21.7435335215, 21.7435335215), (-24.7487373415, 24.7487373415))
            ThreePointArc((-24.7487373415, 24.7487373415), (-26.2056824365, 23.2004786165), (-27.5659383164, 21.5666187599))
        make_face()
        with BuildLine():
            ThreePointArc((-4.2421595409, 34.7419642857), (0, 30.75), (4.2421595409, 34.7419642857))
            ThreePointArc((4.2421595409, 34.7419642857), (0, 35), (-4.2421595409, 34.7419642857))
        make_face()
        with BuildLine():
            ThreePointArc((-4.2421595409, 34.7419642857), (0, 35), (4.2421595409, 34.7419642857))
            ThreePointArc((4.2421595409, 34.7419642857), (4.248039433, 34.8709225982), (4.25, 35))
            ThreePointArc((4.25, 35), (-0.1290774018, 39.248039433), (-4.2421595409, 34.7419642857))
        make_face()
    extrude(amount=-F8_DEPTH, mode=Mode.SUBTRACT)

    # F9 (on Front) → F10 (join, symmetric)
    with BuildSketch(Plane.XZ):
        Polygon((-76.7210857587, 90.5581348548), (0, 13.8370490961), (0, 40), (-63.6396103068, 103.6396103068), align=None)
        Polygon((0, 40), (0, 13.8370490961), (6.2413537338, 59.9215971701), (0, 66.1629509039), align=None)
        Polygon((-63.6396103068, 103.6396103068), (0, 40), (0, 66.1629509039), (-50.5581348548, 116.7210857587), align=None)
    extrude(amount=F10_DEPTH, both=True)

    # F11 (radius 18.5 in the source; OpenCascade refuses exactly that, so slightly less here)
    f11_edges = [f1.edges().sort_by_distance(p)[0] for p in [
        (-46.391732, 18.5, 60.228781),
        (-46.391732, -18.5, 60.228781),
        (-33.310257, -18.5, 99.473208),
        (-33.310257, 18.5, 99.473208),
    ]]
    fillet(f11_edges, radius=F11_R)

    # F12 (on face) → F13 (join)
    with BuildSketch(Plane(origin=(-83.6396103068, 0, 83.6396103068), x_dir=(0, -1, 0), z_dir=(-0.7071067812, 0, 0.7071067812))):
        with Locations((0, 28.2842712475)):
            Circle(F12_R)
    extrude(amount=F13_DEPTH)

    # F14 (on face) → F15 (cut)
    with BuildSketch(Plane(origin=(-90.7106781187, 0, 90.7106781187), x_dir=(0, -1, 0), z_dir=(-0.7071067812, 0, 0.7071067812))):
        with BuildLine():
            ThreePointArc((-2.24742029, 51.6765584815), (0, 49.5342712475), (2.24742029, 51.6765584815))
            ThreePointArc((2.24742029, 51.6765584815), (0, 51.7842712475), (-2.24742029, 51.6765584815))
        make_face()
        with BuildLine():
            ThreePointArc((-2.24742029, 51.6765584815), (0, 51.7842712475), (2.24742029, 51.6765584815))
            ThreePointArc((2.24742029, 51.6765584815), (2.2493549801, 51.7303994207), (2.25, 51.7842712475))
            ThreePointArc((2.25, 51.7842712475), (-0.0538718267, 54.0336262275), (-2.24742029, 51.6765584815))
        make_face()
        with BuildLine():
            ThreePointArc((-23.392287234, 26.0368509574), (-23.5, 28.2842712475), (-23.392287234, 30.5316915375))
            ThreePointArc((-23.392287234, 30.5316915375), (-25.75, 28.2842712475), (-23.392287234, 26.0368509574))
        make_face()
        with BuildLine():
            ThreePointArc((-21.25, 28.2842712475), (-21.8713727063, 29.8367122732), (-23.392287234, 30.5316915375))
            ThreePointArc((-23.392287234, 30.5316915375), (-23.5, 28.2842712475), (-23.392287234, 26.0368509574))
            ThreePointArc((-23.392287234, 26.0368509574), (-21.8713727063, 26.7318302218), (-21.25, 28.2842712475))
        make_face()
        with BuildLine():
            ThreePointArc((-2.24742029, 4.8919840134), (0, 4.7842712475), (2.24742029, 4.8919840134))
            ThreePointArc((2.24742029, 4.8919840134), (0, 7.0342712475), (-2.24742029, 4.8919840134))
        make_face()
        with BuildLine():
            ThreePointArc((2.25, 4.7842712475), (2.2493549801, 4.8381430742), (2.24742029, 4.8919840134))
            ThreePointArc((2.24742029, 4.8919840134), (0, 4.7842712475), (-2.24742029, 4.8919840134))
            ThreePointArc((-2.24742029, 4.8919840134), (-0.0538718267, 2.5349162674), (2.25, 4.7842712475))
        make_face()
        with BuildLine():
            ThreePointArc((23.392287234, 26.0368509574), (23.4730563626, 27.1592712475), (23.5, 28.2842712475))
            ThreePointArc((23.5, 28.2842712475), (23.4730563626, 29.4092712475), (23.392287234, 30.5316915375))
            ThreePointArc((23.392287234, 30.5316915375), (21.25, 28.2842712475), (23.392287234, 26.0368509574))
        make_face()
        with BuildLine():
            ThreePointArc((23.392287234, 30.5316915375), (23.4730563626, 29.4092712475), (23.5, 28.2842712475))
            ThreePointArc((23.5, 28.2842712475), (23.4730563626, 27.1592712475), (23.392287234, 26.0368509574))
            ThreePointArc((23.392287234, 26.0368509574), (25.0524410257, 26.6556439538), (25.75, 28.2842712475))
            ThreePointArc((25.75, 28.2842712475), (25.0524410257, 29.9128985411), (23.392287234, 30.5316915375))
        make_face()
    extrude(amount=-F15_DEPTH, mode=Mode.SUBTRACT)

    # F16 (on face) → F17 (cut)
    with BuildSketch(Plane(origin=(-90.7106781187, 0, 90.7106781187), x_dir=(0, -1, 0), z_dir=(-0.7071067812, 0, 0.7071067812))):
        with Locations((0, 28.2842712475)):
            Circle(F16_R)
    extrude(amount=-F17_DEPTH, mode=Mode.SUBTRACT)

    # F18 (on face) → F19 (cut)
    with BuildSketch(Plane.XY.offset(160)):
        Circle(F18_R)
    extrude(amount=-F19_DEPTH, mode=Mode.SUBTRACT)


solid = f1.part
